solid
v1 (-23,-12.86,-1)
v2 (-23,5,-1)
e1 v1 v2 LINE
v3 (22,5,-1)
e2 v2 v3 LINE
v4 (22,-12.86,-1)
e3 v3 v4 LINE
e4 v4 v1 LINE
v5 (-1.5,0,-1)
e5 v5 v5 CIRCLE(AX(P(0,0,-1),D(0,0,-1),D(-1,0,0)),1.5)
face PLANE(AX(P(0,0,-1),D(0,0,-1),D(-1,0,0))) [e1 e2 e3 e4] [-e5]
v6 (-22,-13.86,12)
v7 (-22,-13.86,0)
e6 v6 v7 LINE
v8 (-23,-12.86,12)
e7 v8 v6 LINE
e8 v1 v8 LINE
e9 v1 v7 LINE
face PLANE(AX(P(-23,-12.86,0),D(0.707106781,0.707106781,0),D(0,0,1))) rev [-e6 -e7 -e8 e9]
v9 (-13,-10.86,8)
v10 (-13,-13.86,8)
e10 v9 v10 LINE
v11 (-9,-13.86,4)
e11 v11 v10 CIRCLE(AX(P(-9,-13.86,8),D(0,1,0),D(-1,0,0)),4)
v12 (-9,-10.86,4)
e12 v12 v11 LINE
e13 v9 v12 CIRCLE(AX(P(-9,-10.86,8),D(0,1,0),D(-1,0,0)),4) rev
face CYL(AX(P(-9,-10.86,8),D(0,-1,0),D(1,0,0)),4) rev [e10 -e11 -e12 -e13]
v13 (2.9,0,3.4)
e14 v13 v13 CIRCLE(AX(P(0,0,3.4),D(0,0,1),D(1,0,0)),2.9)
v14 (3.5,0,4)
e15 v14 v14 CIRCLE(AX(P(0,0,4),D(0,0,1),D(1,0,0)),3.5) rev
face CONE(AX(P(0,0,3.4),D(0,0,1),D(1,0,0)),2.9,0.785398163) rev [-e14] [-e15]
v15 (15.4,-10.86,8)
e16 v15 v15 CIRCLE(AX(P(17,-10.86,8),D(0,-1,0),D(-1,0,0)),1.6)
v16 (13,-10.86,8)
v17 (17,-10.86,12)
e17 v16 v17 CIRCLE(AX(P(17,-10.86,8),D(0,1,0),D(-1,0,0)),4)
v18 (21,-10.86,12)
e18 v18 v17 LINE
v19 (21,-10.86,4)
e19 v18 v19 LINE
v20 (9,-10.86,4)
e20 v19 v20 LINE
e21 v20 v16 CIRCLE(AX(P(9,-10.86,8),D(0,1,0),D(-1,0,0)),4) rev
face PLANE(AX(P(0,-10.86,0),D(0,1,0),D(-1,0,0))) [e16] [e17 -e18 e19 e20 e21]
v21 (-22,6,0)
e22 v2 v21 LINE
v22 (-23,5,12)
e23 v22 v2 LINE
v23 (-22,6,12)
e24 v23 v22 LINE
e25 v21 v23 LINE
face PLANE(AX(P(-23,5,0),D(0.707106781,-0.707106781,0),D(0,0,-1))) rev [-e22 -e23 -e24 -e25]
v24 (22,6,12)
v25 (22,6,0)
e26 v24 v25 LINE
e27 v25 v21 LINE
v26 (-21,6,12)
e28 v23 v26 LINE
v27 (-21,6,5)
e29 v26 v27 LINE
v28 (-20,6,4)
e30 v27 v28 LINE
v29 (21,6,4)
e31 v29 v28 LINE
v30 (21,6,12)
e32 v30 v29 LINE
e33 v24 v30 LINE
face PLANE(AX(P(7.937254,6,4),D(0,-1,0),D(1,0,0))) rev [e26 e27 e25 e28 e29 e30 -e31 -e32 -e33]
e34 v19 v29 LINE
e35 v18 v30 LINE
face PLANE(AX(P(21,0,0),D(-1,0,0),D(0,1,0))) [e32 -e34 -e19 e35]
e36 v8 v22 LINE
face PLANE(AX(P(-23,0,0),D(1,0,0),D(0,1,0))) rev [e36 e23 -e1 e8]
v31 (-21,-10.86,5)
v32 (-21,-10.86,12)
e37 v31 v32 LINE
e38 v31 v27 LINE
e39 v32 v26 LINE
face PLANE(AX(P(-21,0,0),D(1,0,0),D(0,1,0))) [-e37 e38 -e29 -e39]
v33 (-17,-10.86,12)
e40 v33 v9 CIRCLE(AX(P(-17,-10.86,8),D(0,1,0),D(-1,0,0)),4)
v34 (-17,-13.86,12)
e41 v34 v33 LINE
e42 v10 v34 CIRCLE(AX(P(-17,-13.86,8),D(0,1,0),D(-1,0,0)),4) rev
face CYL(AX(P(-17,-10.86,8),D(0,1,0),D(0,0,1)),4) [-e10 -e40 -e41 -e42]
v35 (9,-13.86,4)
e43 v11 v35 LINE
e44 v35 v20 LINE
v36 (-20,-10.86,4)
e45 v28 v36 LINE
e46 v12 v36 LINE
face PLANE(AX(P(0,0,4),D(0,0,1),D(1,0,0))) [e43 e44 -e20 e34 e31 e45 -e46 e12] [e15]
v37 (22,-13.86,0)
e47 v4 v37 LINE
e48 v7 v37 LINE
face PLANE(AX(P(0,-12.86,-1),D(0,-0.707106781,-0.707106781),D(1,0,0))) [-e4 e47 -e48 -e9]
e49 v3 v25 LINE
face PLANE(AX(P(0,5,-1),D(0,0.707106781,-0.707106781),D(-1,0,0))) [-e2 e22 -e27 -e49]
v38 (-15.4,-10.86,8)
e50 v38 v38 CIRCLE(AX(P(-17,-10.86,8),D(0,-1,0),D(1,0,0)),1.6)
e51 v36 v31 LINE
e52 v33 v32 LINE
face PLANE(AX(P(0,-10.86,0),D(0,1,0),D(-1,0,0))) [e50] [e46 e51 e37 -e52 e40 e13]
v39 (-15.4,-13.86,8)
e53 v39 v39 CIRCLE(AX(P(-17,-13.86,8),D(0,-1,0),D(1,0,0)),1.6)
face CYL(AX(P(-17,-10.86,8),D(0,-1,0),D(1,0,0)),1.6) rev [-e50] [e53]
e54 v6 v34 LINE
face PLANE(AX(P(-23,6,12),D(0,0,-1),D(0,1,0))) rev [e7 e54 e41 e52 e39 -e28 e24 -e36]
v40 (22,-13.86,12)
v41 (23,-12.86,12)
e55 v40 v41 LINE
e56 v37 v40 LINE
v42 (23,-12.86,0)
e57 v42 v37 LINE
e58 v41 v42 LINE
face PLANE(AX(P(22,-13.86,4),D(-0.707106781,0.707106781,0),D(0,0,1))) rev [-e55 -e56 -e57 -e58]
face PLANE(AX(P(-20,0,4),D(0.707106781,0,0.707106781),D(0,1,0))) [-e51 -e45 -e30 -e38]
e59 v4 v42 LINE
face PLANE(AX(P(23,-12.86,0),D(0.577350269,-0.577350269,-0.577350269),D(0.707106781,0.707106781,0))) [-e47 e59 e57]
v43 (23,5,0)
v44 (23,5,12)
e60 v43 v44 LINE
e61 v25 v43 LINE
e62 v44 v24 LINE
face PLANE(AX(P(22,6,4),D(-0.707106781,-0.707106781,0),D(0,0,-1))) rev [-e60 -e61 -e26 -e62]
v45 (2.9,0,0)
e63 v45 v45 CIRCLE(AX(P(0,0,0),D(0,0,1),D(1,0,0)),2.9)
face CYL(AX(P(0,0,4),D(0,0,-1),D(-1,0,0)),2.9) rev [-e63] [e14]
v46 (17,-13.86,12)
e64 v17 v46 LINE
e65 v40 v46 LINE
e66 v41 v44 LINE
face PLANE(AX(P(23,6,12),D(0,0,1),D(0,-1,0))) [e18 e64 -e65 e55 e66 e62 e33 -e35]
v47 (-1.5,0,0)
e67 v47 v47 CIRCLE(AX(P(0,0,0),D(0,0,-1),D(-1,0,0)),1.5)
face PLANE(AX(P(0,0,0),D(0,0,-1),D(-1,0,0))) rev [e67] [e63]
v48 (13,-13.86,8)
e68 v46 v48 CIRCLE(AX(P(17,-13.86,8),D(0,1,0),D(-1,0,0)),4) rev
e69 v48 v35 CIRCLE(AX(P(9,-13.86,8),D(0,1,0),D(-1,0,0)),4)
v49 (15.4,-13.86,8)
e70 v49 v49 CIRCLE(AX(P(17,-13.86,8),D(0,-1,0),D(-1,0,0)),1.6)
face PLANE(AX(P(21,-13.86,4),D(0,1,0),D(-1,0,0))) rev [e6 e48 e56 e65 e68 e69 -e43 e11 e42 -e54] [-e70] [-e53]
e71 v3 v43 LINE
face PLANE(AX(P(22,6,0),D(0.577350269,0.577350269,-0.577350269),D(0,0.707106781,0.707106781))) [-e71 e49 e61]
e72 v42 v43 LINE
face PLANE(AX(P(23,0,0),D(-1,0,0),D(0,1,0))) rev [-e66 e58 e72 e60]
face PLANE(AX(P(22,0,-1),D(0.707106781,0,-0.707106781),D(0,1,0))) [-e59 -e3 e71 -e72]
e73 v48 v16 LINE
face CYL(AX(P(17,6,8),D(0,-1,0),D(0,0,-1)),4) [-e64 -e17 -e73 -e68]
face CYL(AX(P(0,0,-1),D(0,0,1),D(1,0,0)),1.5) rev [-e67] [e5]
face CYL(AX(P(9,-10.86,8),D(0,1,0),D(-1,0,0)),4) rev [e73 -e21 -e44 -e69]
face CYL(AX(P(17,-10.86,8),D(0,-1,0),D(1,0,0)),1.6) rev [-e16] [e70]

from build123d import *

# Parameters (mm, degrees)
SKETCH_1_R       = 2.9
EXTRUDE_1_DEPTH  = 4
CHAMFER_1_SIZE   = 0.6
SKETCH_3_W       = 12
SKETCH_3_H       = 19.86
EXTRUDE_2_DEPTH  = 2
SKETCH_4_W       = 10
SKETCH_4_H       = 12
SKETCH_4_R       = 1.6
EXTRUDE_3_DEPTH  = 3
FILLET_START     = -15
FILLET_2_DEPTH   = 4.14
FILLET_START_2   = -13.86
FILLET_2_2_DEPTH = 3
SKETCH_5_W       = 46
SKETCH_5_H       = 19.86
SKETCH_5_R       = 1.5
EXTRUDE_4_DEPTH  = 1
CHAMFER_4_SIZE   = 1


with BuildPart() as part:
    # 草图1 → 凸台-拉伸1 (new body)
    with BuildSketch(Plane.XY):
        Polygon((7.937253933, 6), (-21, 6), (-21, -13.86), (7.937253933, -13.86), (21, -13.86), (21, 6), align=None)
        Circle(SKETCH_1_R, mode=Mode.SUBTRACT)
    extrude(amount=EXTRUDE_1_DEPTH)

    # 倒角1
    chamfer_1_edges = [part.edges().sort_by_distance(p)[0] for p in [
        (-2.9, 0, 4),
    ]]
    chamfer(chamfer_1_edges, length=CHAMFER_1_SIZE)

    # 草图3 → 凸台-拉伸2 (add)
    with BuildSketch(Plane.ZY.offset(21)):
        with Locations((6, -3.93)):
            Rectangle(SKETCH_3_W, SKETCH_3_H)
    extrude_2 = extrude(amount=EXTRUDE_2_DEPTH)

    # 镜向1: 凸台-拉伸2 across plane
    add(extrude_2.mirror(Plane(origin=(0, 0, 0), x_dir=(0, 0, 1), z_dir=(1, 0, 0))))

    # 草图4 → 凸台-拉伸3 (add)
    # profile 1 of 2: a face of its own
    with BuildSketch(Plane.XZ.offset(13.86)):
        with Locations((-18, 6)):
            Rectangle(SKETCH_4_W, SKETCH_4_H)
        with Locations((-17, 8)):
            Circle(SKETCH_4_R, mode=Mode.SUBTRACT)
    # profile 2 of 2: a face of its own
    with BuildSketch(Plane.XZ.offset(13.86)):
        with Locations((18, 6)):
            Rectangle(SKETCH_4_W, SKETCH_4_H)
        with Locations(Location((17, 8, 0), (0, 0, 180))):
            Circle(SKETCH_4_R, mode=Mode.SUBTRACT)
    extrude(amount=-EXTRUDE_3_DEPTH)

    # 圆角2: read off the stored shape, not the designer's step
    # 圆角2 outline → 圆角2 (cut)
    with BuildSketch(Plane(origin=(0, 0, 0), x_dir=(1, 0, 0), z_dir=(0, 1, 0)).offset(FILLET_START)):
        with BuildLine():
            Line((13, -12), (17, -12))
            ThreePointArc((17, -12), (14.171572875, -10.828427125), (13, -8))
            Line((13, -8), (13, -12))
        make_face()
        with BuildLine():
            Line((-13, -12), (-13, -8))
            ThreePointArc((-13, -8), (-14.171572875, -10.828427125), (-17, -12))
            Line((-17, -12), (-13, -12))
        make_face()
    extrude(amount=FILLET_2_DEPTH, mode=Mode.SUBTRACT)

    # Fillet 2 2 outline → Fillet 2 2 (add)
    with BuildSketch(Plane(origin=(0, 0, 0), x_dir=(1, 0, 0), z_dir=(0, 1, 0)).offset(FILLET_START_2)):
        with BuildLine():
            ThreePointArc((-13, -8), (-11.828427125, -5.171572875), (-9, -4))
            Line((-9, -4), (-13, -4))
            Line((-13, -4), (-13, -8))
        make_face()
        with BuildLine():
            ThreePointArc((9, -4), (11.828427125, -5.171572875), (13, -8))
            Line((13, -8), (13, -4))
            Line((13, -4), (9, -4))
        make_face()
    extrude(amount=FILLET_2_2_DEPTH)

    # 草图5 → 凸台-拉伸4 (add)
    with BuildSketch(Plane(origin=(0, 0, 0), x_dir=(-1, 0, 0), z_dir=(0, 0, -1))):
        with Locations((0, -3.93)):
            Rectangle(SKETCH_5_W, SKETCH_5_H)
        Circle(SKETCH_5_R, mode=Mode.SUBTRACT)
    extrude(amount=EXTRUDE_4_DEPTH)

    # 倒角4
    chamfer_4_edges = [part.edges().sort_by_distance(p)[0] for p in [
        (0, 6, -1),
        (23, -3.93, -1),
        (0, -13.86, -1),
        (-23, 6, 5.5),
        (-23, -13.86, 5.5),
        (23, -13.86, 5.5),
        (23, 6, 5.5),
        (-21, -2.43, 4),
    ]]
    chamfer(chamfer_4_edges, length=CHAMFER_4_SIZE)


solid = part.part
